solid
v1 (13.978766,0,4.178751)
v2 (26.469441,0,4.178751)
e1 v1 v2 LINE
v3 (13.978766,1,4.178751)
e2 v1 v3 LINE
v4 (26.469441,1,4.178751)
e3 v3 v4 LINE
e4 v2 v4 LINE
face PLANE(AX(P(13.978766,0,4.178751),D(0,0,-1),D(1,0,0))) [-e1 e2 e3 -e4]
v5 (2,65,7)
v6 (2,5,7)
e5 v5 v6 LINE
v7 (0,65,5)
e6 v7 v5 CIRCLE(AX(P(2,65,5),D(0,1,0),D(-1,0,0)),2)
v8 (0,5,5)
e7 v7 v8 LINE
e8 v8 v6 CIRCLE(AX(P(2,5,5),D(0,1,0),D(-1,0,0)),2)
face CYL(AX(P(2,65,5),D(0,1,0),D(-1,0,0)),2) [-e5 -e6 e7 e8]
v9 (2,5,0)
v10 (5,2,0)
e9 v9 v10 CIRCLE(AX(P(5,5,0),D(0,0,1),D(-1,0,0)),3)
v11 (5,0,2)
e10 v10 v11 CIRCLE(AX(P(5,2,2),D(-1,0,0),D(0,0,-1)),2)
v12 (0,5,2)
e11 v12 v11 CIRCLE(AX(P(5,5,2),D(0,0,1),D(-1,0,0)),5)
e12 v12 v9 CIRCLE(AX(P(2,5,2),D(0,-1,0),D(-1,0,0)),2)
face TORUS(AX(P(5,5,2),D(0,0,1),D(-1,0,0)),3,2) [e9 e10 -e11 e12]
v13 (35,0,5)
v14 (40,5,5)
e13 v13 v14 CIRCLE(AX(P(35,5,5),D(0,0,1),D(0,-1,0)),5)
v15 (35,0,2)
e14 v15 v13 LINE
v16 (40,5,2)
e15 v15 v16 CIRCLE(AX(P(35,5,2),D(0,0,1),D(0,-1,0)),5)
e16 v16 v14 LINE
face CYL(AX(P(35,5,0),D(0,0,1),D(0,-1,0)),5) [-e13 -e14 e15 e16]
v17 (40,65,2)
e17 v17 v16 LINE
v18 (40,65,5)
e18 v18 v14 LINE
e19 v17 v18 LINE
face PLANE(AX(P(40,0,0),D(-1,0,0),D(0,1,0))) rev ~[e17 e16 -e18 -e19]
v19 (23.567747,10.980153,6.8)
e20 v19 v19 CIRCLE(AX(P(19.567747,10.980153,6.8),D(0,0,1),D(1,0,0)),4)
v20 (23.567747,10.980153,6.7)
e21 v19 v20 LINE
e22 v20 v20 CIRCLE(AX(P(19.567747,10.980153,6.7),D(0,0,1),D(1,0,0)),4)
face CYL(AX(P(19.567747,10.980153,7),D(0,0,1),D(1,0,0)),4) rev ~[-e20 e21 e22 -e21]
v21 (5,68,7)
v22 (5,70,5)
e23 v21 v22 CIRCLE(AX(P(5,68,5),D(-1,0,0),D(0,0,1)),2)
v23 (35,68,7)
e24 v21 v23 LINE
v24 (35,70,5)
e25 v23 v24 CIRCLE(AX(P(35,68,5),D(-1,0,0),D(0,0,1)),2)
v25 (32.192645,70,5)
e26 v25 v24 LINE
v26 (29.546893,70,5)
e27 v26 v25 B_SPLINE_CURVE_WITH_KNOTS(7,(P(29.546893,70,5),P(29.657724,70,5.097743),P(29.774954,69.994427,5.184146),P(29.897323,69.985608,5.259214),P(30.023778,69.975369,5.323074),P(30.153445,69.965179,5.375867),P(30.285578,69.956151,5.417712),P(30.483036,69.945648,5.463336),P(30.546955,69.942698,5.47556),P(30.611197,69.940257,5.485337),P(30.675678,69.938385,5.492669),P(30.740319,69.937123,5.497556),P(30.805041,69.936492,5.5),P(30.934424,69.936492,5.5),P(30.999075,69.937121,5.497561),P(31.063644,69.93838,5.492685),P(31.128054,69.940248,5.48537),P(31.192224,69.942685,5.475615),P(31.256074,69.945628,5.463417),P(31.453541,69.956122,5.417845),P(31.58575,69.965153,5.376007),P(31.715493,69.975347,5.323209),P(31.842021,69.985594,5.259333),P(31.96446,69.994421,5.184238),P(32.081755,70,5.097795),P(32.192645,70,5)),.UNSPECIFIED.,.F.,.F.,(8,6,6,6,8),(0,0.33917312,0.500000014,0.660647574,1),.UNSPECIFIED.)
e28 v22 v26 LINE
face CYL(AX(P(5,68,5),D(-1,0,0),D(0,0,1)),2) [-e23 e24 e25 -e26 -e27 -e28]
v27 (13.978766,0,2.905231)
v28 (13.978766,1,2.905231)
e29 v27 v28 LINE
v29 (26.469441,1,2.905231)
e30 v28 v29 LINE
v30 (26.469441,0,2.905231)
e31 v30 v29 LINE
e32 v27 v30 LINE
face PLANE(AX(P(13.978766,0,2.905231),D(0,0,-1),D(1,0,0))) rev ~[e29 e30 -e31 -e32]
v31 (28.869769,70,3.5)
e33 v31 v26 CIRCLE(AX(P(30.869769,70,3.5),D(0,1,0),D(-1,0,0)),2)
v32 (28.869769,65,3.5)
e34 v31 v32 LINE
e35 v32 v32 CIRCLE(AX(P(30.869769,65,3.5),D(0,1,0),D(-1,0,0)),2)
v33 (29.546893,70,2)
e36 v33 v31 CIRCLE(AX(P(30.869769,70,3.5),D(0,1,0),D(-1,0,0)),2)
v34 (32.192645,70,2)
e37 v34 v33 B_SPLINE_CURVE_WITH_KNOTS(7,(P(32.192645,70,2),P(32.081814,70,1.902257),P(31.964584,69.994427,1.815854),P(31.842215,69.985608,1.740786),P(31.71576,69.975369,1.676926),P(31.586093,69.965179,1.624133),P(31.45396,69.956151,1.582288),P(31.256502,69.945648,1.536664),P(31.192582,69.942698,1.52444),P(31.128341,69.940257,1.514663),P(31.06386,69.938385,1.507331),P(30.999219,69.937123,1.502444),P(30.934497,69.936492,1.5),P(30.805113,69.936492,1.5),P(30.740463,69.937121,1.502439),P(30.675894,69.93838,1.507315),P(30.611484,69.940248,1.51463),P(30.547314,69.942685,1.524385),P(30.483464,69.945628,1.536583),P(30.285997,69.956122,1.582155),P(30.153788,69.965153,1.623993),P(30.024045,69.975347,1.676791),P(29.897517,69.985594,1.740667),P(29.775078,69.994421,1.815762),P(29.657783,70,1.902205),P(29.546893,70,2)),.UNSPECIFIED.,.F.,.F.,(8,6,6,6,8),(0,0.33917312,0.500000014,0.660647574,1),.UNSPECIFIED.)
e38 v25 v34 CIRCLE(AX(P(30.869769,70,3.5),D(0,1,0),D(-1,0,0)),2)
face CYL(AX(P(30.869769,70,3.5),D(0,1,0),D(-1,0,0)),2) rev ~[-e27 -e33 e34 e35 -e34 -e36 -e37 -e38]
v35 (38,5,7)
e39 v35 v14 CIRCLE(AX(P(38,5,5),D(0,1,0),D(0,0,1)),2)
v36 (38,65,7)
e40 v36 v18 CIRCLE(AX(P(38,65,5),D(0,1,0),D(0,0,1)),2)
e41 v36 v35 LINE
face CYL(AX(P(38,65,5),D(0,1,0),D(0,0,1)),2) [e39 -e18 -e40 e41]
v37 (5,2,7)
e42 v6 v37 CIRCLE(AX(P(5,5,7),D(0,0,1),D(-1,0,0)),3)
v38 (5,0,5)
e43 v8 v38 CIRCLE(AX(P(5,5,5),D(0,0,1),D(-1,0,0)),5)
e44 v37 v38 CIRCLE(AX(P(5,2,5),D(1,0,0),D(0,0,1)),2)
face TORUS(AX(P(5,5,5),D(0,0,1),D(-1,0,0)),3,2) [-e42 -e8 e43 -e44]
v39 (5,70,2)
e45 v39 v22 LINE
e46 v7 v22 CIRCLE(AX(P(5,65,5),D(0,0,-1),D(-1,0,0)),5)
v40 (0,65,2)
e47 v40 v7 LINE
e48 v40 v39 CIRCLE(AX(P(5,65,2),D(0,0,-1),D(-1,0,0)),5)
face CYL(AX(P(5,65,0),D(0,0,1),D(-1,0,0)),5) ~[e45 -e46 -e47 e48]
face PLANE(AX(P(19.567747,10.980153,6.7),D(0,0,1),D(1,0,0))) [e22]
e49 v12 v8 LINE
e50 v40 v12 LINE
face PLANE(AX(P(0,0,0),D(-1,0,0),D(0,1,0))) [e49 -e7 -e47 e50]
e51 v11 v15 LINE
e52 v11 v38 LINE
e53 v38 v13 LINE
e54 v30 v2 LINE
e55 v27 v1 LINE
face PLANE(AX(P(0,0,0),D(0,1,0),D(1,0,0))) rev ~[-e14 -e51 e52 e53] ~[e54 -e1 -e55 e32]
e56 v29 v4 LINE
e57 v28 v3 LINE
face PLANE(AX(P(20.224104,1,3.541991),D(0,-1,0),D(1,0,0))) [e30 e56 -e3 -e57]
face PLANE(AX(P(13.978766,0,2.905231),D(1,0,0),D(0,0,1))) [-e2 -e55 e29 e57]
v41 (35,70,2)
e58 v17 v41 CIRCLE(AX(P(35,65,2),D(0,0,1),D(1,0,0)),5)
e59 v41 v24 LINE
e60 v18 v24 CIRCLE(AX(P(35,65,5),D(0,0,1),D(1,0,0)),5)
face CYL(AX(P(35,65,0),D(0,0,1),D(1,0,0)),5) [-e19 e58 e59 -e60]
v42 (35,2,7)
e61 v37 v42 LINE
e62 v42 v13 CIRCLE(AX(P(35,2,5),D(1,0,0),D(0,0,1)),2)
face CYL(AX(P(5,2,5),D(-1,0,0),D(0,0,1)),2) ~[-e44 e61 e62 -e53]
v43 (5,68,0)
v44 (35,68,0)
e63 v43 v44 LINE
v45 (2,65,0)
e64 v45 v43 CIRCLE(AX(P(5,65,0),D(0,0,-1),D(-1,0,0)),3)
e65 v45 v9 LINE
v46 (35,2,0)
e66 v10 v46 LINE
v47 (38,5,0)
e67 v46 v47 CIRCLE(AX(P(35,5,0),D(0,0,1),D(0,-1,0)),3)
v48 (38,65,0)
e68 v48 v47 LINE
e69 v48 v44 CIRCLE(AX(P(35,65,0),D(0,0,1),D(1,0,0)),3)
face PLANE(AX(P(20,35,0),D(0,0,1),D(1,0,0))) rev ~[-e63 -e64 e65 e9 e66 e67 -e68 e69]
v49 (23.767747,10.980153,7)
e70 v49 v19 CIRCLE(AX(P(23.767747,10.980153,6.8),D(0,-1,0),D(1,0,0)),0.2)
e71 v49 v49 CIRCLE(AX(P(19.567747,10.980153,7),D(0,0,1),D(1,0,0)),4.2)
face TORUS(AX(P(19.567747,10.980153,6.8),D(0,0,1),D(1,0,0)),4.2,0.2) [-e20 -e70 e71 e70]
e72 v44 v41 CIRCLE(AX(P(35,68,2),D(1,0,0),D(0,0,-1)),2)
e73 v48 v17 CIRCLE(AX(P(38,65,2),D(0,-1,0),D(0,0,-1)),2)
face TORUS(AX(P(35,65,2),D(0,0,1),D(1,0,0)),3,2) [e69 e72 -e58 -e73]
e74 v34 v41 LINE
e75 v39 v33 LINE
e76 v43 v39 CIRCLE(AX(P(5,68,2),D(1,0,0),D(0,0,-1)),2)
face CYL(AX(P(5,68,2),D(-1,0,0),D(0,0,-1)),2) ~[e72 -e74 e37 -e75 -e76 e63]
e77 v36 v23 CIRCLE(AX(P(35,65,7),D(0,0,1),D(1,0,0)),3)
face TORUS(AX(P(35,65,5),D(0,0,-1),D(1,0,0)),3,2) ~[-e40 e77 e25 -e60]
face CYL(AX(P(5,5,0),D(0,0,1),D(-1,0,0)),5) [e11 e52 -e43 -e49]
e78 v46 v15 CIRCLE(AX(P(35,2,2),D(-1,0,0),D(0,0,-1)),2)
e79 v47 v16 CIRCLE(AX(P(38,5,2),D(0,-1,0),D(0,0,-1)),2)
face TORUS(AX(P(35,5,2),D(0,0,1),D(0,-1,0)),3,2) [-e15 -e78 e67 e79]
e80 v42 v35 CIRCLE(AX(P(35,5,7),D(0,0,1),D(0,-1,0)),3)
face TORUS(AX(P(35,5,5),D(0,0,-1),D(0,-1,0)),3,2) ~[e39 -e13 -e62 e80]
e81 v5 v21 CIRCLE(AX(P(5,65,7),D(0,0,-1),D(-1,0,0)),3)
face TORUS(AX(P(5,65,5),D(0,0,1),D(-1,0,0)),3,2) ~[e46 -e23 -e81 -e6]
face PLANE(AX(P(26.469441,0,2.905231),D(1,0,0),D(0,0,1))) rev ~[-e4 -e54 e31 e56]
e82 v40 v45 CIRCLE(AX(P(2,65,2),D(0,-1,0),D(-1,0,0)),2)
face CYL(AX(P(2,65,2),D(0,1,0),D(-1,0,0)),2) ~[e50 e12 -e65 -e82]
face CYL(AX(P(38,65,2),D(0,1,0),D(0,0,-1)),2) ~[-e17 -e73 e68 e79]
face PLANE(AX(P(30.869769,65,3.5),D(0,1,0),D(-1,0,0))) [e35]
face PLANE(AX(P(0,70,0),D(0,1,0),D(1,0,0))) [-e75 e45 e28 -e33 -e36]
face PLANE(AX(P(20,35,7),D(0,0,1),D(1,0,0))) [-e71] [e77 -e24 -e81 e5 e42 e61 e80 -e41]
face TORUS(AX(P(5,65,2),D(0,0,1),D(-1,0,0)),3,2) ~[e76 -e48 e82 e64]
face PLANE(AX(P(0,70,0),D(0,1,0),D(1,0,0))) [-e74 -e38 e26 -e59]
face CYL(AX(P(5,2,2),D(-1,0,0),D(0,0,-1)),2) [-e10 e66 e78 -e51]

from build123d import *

# Parameters (mm, degrees)
F0_W         = 40
F0_H         = 70
F1_DEPTH     = 7
F2_R         = 5
F3_R         = 2
F4_DEPTH     = 5
F5_T1_DEPTH  = 60
F5_T3_DEPTH  = 30
F5_T6_ANGLE  = 90
F5_T8_ANGLE  = 90
F5_T10_ANGLE = 90
F5_T12_ANGLE = 90
F5_T14_ANGLE = 90
F5_T16_ANGLE = 90
F5_T18_ANGLE = 90
F5_T20_ANGLE = 90
F6_R         = 4
F7_DEPTH     = 0.3
F8_R         = 0.2
F9_W         = 12.4906748533
F9_H         = 1.2735207565
F10_DEPTH    = 1


# Not quite as in the source:
# - a fillet or chamfer that OpenCascade refuses, or shapes differently, is made with other operations: its cross-section is extruded or revolved along the edge and cut away or added


with BuildPart() as f1:
    # F0 (on Top) → F1 (new body)
    with BuildSketch(Plane.XY):
        with Locations((20, 35)):
            Rectangle(F0_W, F0_H)
    extrude(amount=F1_DEPTH)

    # F2
    f2_edges = [f1.edges().sort_by_distance(p)[0] for p in [
        (40, 0, 3.5),
        (0, 0, 3.5),
        (40, 70, 3.5),
        (0, 70, 3.5),
    ]]
    fillet(f2_edges, radius=F2_R)

    # F3 (on face) → F4 (cut)
    with BuildSketch(Plane(origin=(0, 70, 0), x_dir=(-1, 0, 0), z_dir=(0, 1, 0))):
        with Locations((-30.8697689325, 3.5)):
            Circle(F3_R)
    extrude(amount=-F4_DEPTH, mode=Mode.SUBTRACT)

    # F5: fillet of radius 2 on 16 edges, made by hand

    # F5_s2 → F5_t1 (cut)
    with BuildSketch(Plane.XZ.offset(-65)):
        with BuildLine():
            ThreePointArc((0, 5), (0.5857864376, 6.4142135624), (2, 7))
            Line((2, 7), (0, 7))
            Line((0, 7), (0, 5))
        make_face()
        with BuildLine():
            ThreePointArc((38, 7), (39.4142135624, 6.4142135624), (40, 5))
            Line((40, 5), (40, 7))
            Line((40, 7), (38, 7))
        make_face()
        with BuildLine():
            ThreePointArc((0, 2), (0.5857864376, 0.5857864376), (2, 0))
            Line((2, 0), (0, 0))
            Line((0, 0), (0, 2))
        make_face()
        with BuildLine():
            ThreePointArc((38, 0), (39.4142135624, 0.5857864376), (40, 2))
            Line((40, 2), (40, 0))
            Line((40, 0), (38, 0))
        make_face()
    extrude(amount=F5_T1_DEPTH, mode=Mode.SUBTRACT)

    # F5_s4 → F5_t3 (cut)
    with BuildSketch(Plane.YZ.offset(5)):
        with BuildLine():
            ThreePointArc((68, 7), (69.4142135624, 6.4142135624), (70, 5))
            Line((70, 5), (70, 7))
            Line((70, 7), (68, 7))
        make_face()
        with BuildLine():
            ThreePointArc((2, 7), (0.5857864376, 6.4142135624), (0, 5))
            Line((0, 5), (0, 7))
            Line((0, 7), (2, 7))
        make_face()
        with BuildLine():
            ThreePointArc((68, 0), (69.4142135624, 0.5857864376), (70, 2))
            Line((70, 2), (70, 0))
            Line((70, 0), (68, 0))
        make_face()
        with BuildLine():
            ThreePointArc((2, 0), (0.5857864376, 0.5857864376), (0, 2))
            Line((0, 2), (0, 0))
            Line((0, 0), (2, 0))
        make_face()
    extrude(amount=F5_T3_DEPTH, mode=Mode.SUBTRACT)

    # F5_s5 → F5_t6 (revolve, cut)
    with BuildSketch(Plane.XZ.offset(-65)):
        with BuildLine():
            ThreePointArc((0, 5), (0.5857864376, 6.4142135624), (2, 7))
            Line((2, 7), (0, 7))
            Line((0, 7), (0, 5))
        make_face()
    revolve(axis=Axis((5, 65, 7), (0, 0, -1)), revolution_arc=F5_T6_ANGLE, mode=Mode.SUBTRACT)

    # F5_s7 → F5_t8 (revolve, cut)
    with BuildSketch(Plane.XZ.offset(-5)):
        with BuildLine():
            ThreePointArc((0, 5), (0.5857864376, 6.4142135624), (2, 7))
            Line((2, 7), (0, 7))
            Line((0, 7), (0, 5))
        make_face()
    revolve(axis=Axis((5, 5, 7), (0, 0, 1)), revolution_arc=F5_T8_ANGLE, mode=Mode.SUBTRACT)

    # F5_s9 → F5_t10 (revolve, cut)
    with BuildSketch(Plane.XZ.offset(-65)):
        with BuildLine():
            ThreePointArc((38, 7), (39.4142135624, 6.4142135624), (40, 5))
            Line((40, 5), (40, 7))
            Line((40, 7), (38, 7))
        make_face()
    revolve(axis=Axis((35, 65, 7), (0, 0, 1)), revolution_arc=F5_T10_ANGLE, mode=Mode.SUBTRACT)

    # F5_s11 → F5_t12 (revolve, cut)
    with BuildSketch(Plane.YZ.offset(35)):
        with BuildLine():
            ThreePointArc((2, 7), (0.5857864376, 6.4142135624), (0, 5))
            Line((0, 5), (0, 7))
            Line((0, 7), (2, 7))
        make_face()
    revolve(axis=Axis((35, 5, 7), (0, 0, 1)), revolution_arc=F5_T12_ANGLE, mode=Mode.SUBTRACT)

    # F5_s13 → F5_t14 (revolve, cut)
    with BuildSketch(Plane.XZ.offset(-65)):
        with BuildLine():
            ThreePointArc((2, 0), (0.5857864376, 0.5857864376), (0, 2))
            Line((0, 2), (0, 0))
            Line((0, 0), (2, 0))
        make_face()
    revolve(axis=Axis((5, 65, 0), (0, 0, -1)), revolution_arc=F5_T14_ANGLE, mode=Mode.SUBTRACT)

    # F5_s15 → F5_t16 (revolve, cut)
    with BuildSketch(Plane.XZ.offset(-5)):
        with BuildLine():
            ThreePointArc((2, 0), (0.5857864376, 0.5857864376), (0, 2))
            Line((0, 2), (0, 0))
            Line((0, 0), (2, 0))
        make_face()
    revolve(axis=Axis((5, 5, 0), (0, 0, 1)), revolution_arc=F5_T16_ANGLE, mode=Mode.SUBTRACT)

    # F5_s17 → F5_t18 (revolve, cut)
    with BuildSketch(Plane.XZ.offset(-65)):
        with BuildLine():
            ThreePointArc((38, 0), (39.4142135624, 0.5857864376), (40, 2))
            Line((40, 2), (40, 0))
            Line((40, 0), (38, 0))
        make_face()
    revolve(axis=Axis((35, 65, 0), (0, 0, 1)), revolution_arc=F5_T18_ANGLE, mode=Mode.SUBTRACT)

    # F5_s19 → F5_t20 (revolve, cut)
    with BuildSketch(Plane.YZ.offset(35)):
        with BuildLine():
            ThreePointArc((2, 0), (0.5857864376, 0.5857864376), (0, 2))
            Line((0, 2), (0, 0))
            Line((0, 0), (2, 0))
        make_face()
    revolve(axis=Axis((35, 5, 0), (0, 0, 1)), revolution_arc=F5_T20_ANGLE, mode=Mode.SUBTRACT)

    # F6 (on face) → F7 (cut)
    with BuildSketch(Plane.XY.offset(7)):
        with Locations((19.5677466691, 10.9801534563)):
            Circle(F6_R)
    extrude(amount=-F7_DEPTH, mode=Mode.SUBTRACT)

    # F8
    f8_edges = [f1.edges().sort_by_distance(p)[0] for p in [
        (15.567747, 10.980153, 7),
        (2.87868, 67.12132, 7),
        (2, 35, 7),
        (20, 68, 7),
        (2.87868, 2.87868, 7),
        (37.12132, 67.12132, 7),
        (20, 2, 7),
        (38, 35, 7),
        (37.12132, 2.87868, 7),
    ]]
    fillet(f8_edges, radius=F8_R)

    # F9 (on face) → F10 (cut)
    with BuildSketch(Plane.XZ):
        with Locations((20.2241037041, 3.5419908818)):
            Rectangle(F9_W, F9_H)
    extrude(amount=-F10_DEPTH, mode=Mode.SUBTRACT)


solid = f1.part
